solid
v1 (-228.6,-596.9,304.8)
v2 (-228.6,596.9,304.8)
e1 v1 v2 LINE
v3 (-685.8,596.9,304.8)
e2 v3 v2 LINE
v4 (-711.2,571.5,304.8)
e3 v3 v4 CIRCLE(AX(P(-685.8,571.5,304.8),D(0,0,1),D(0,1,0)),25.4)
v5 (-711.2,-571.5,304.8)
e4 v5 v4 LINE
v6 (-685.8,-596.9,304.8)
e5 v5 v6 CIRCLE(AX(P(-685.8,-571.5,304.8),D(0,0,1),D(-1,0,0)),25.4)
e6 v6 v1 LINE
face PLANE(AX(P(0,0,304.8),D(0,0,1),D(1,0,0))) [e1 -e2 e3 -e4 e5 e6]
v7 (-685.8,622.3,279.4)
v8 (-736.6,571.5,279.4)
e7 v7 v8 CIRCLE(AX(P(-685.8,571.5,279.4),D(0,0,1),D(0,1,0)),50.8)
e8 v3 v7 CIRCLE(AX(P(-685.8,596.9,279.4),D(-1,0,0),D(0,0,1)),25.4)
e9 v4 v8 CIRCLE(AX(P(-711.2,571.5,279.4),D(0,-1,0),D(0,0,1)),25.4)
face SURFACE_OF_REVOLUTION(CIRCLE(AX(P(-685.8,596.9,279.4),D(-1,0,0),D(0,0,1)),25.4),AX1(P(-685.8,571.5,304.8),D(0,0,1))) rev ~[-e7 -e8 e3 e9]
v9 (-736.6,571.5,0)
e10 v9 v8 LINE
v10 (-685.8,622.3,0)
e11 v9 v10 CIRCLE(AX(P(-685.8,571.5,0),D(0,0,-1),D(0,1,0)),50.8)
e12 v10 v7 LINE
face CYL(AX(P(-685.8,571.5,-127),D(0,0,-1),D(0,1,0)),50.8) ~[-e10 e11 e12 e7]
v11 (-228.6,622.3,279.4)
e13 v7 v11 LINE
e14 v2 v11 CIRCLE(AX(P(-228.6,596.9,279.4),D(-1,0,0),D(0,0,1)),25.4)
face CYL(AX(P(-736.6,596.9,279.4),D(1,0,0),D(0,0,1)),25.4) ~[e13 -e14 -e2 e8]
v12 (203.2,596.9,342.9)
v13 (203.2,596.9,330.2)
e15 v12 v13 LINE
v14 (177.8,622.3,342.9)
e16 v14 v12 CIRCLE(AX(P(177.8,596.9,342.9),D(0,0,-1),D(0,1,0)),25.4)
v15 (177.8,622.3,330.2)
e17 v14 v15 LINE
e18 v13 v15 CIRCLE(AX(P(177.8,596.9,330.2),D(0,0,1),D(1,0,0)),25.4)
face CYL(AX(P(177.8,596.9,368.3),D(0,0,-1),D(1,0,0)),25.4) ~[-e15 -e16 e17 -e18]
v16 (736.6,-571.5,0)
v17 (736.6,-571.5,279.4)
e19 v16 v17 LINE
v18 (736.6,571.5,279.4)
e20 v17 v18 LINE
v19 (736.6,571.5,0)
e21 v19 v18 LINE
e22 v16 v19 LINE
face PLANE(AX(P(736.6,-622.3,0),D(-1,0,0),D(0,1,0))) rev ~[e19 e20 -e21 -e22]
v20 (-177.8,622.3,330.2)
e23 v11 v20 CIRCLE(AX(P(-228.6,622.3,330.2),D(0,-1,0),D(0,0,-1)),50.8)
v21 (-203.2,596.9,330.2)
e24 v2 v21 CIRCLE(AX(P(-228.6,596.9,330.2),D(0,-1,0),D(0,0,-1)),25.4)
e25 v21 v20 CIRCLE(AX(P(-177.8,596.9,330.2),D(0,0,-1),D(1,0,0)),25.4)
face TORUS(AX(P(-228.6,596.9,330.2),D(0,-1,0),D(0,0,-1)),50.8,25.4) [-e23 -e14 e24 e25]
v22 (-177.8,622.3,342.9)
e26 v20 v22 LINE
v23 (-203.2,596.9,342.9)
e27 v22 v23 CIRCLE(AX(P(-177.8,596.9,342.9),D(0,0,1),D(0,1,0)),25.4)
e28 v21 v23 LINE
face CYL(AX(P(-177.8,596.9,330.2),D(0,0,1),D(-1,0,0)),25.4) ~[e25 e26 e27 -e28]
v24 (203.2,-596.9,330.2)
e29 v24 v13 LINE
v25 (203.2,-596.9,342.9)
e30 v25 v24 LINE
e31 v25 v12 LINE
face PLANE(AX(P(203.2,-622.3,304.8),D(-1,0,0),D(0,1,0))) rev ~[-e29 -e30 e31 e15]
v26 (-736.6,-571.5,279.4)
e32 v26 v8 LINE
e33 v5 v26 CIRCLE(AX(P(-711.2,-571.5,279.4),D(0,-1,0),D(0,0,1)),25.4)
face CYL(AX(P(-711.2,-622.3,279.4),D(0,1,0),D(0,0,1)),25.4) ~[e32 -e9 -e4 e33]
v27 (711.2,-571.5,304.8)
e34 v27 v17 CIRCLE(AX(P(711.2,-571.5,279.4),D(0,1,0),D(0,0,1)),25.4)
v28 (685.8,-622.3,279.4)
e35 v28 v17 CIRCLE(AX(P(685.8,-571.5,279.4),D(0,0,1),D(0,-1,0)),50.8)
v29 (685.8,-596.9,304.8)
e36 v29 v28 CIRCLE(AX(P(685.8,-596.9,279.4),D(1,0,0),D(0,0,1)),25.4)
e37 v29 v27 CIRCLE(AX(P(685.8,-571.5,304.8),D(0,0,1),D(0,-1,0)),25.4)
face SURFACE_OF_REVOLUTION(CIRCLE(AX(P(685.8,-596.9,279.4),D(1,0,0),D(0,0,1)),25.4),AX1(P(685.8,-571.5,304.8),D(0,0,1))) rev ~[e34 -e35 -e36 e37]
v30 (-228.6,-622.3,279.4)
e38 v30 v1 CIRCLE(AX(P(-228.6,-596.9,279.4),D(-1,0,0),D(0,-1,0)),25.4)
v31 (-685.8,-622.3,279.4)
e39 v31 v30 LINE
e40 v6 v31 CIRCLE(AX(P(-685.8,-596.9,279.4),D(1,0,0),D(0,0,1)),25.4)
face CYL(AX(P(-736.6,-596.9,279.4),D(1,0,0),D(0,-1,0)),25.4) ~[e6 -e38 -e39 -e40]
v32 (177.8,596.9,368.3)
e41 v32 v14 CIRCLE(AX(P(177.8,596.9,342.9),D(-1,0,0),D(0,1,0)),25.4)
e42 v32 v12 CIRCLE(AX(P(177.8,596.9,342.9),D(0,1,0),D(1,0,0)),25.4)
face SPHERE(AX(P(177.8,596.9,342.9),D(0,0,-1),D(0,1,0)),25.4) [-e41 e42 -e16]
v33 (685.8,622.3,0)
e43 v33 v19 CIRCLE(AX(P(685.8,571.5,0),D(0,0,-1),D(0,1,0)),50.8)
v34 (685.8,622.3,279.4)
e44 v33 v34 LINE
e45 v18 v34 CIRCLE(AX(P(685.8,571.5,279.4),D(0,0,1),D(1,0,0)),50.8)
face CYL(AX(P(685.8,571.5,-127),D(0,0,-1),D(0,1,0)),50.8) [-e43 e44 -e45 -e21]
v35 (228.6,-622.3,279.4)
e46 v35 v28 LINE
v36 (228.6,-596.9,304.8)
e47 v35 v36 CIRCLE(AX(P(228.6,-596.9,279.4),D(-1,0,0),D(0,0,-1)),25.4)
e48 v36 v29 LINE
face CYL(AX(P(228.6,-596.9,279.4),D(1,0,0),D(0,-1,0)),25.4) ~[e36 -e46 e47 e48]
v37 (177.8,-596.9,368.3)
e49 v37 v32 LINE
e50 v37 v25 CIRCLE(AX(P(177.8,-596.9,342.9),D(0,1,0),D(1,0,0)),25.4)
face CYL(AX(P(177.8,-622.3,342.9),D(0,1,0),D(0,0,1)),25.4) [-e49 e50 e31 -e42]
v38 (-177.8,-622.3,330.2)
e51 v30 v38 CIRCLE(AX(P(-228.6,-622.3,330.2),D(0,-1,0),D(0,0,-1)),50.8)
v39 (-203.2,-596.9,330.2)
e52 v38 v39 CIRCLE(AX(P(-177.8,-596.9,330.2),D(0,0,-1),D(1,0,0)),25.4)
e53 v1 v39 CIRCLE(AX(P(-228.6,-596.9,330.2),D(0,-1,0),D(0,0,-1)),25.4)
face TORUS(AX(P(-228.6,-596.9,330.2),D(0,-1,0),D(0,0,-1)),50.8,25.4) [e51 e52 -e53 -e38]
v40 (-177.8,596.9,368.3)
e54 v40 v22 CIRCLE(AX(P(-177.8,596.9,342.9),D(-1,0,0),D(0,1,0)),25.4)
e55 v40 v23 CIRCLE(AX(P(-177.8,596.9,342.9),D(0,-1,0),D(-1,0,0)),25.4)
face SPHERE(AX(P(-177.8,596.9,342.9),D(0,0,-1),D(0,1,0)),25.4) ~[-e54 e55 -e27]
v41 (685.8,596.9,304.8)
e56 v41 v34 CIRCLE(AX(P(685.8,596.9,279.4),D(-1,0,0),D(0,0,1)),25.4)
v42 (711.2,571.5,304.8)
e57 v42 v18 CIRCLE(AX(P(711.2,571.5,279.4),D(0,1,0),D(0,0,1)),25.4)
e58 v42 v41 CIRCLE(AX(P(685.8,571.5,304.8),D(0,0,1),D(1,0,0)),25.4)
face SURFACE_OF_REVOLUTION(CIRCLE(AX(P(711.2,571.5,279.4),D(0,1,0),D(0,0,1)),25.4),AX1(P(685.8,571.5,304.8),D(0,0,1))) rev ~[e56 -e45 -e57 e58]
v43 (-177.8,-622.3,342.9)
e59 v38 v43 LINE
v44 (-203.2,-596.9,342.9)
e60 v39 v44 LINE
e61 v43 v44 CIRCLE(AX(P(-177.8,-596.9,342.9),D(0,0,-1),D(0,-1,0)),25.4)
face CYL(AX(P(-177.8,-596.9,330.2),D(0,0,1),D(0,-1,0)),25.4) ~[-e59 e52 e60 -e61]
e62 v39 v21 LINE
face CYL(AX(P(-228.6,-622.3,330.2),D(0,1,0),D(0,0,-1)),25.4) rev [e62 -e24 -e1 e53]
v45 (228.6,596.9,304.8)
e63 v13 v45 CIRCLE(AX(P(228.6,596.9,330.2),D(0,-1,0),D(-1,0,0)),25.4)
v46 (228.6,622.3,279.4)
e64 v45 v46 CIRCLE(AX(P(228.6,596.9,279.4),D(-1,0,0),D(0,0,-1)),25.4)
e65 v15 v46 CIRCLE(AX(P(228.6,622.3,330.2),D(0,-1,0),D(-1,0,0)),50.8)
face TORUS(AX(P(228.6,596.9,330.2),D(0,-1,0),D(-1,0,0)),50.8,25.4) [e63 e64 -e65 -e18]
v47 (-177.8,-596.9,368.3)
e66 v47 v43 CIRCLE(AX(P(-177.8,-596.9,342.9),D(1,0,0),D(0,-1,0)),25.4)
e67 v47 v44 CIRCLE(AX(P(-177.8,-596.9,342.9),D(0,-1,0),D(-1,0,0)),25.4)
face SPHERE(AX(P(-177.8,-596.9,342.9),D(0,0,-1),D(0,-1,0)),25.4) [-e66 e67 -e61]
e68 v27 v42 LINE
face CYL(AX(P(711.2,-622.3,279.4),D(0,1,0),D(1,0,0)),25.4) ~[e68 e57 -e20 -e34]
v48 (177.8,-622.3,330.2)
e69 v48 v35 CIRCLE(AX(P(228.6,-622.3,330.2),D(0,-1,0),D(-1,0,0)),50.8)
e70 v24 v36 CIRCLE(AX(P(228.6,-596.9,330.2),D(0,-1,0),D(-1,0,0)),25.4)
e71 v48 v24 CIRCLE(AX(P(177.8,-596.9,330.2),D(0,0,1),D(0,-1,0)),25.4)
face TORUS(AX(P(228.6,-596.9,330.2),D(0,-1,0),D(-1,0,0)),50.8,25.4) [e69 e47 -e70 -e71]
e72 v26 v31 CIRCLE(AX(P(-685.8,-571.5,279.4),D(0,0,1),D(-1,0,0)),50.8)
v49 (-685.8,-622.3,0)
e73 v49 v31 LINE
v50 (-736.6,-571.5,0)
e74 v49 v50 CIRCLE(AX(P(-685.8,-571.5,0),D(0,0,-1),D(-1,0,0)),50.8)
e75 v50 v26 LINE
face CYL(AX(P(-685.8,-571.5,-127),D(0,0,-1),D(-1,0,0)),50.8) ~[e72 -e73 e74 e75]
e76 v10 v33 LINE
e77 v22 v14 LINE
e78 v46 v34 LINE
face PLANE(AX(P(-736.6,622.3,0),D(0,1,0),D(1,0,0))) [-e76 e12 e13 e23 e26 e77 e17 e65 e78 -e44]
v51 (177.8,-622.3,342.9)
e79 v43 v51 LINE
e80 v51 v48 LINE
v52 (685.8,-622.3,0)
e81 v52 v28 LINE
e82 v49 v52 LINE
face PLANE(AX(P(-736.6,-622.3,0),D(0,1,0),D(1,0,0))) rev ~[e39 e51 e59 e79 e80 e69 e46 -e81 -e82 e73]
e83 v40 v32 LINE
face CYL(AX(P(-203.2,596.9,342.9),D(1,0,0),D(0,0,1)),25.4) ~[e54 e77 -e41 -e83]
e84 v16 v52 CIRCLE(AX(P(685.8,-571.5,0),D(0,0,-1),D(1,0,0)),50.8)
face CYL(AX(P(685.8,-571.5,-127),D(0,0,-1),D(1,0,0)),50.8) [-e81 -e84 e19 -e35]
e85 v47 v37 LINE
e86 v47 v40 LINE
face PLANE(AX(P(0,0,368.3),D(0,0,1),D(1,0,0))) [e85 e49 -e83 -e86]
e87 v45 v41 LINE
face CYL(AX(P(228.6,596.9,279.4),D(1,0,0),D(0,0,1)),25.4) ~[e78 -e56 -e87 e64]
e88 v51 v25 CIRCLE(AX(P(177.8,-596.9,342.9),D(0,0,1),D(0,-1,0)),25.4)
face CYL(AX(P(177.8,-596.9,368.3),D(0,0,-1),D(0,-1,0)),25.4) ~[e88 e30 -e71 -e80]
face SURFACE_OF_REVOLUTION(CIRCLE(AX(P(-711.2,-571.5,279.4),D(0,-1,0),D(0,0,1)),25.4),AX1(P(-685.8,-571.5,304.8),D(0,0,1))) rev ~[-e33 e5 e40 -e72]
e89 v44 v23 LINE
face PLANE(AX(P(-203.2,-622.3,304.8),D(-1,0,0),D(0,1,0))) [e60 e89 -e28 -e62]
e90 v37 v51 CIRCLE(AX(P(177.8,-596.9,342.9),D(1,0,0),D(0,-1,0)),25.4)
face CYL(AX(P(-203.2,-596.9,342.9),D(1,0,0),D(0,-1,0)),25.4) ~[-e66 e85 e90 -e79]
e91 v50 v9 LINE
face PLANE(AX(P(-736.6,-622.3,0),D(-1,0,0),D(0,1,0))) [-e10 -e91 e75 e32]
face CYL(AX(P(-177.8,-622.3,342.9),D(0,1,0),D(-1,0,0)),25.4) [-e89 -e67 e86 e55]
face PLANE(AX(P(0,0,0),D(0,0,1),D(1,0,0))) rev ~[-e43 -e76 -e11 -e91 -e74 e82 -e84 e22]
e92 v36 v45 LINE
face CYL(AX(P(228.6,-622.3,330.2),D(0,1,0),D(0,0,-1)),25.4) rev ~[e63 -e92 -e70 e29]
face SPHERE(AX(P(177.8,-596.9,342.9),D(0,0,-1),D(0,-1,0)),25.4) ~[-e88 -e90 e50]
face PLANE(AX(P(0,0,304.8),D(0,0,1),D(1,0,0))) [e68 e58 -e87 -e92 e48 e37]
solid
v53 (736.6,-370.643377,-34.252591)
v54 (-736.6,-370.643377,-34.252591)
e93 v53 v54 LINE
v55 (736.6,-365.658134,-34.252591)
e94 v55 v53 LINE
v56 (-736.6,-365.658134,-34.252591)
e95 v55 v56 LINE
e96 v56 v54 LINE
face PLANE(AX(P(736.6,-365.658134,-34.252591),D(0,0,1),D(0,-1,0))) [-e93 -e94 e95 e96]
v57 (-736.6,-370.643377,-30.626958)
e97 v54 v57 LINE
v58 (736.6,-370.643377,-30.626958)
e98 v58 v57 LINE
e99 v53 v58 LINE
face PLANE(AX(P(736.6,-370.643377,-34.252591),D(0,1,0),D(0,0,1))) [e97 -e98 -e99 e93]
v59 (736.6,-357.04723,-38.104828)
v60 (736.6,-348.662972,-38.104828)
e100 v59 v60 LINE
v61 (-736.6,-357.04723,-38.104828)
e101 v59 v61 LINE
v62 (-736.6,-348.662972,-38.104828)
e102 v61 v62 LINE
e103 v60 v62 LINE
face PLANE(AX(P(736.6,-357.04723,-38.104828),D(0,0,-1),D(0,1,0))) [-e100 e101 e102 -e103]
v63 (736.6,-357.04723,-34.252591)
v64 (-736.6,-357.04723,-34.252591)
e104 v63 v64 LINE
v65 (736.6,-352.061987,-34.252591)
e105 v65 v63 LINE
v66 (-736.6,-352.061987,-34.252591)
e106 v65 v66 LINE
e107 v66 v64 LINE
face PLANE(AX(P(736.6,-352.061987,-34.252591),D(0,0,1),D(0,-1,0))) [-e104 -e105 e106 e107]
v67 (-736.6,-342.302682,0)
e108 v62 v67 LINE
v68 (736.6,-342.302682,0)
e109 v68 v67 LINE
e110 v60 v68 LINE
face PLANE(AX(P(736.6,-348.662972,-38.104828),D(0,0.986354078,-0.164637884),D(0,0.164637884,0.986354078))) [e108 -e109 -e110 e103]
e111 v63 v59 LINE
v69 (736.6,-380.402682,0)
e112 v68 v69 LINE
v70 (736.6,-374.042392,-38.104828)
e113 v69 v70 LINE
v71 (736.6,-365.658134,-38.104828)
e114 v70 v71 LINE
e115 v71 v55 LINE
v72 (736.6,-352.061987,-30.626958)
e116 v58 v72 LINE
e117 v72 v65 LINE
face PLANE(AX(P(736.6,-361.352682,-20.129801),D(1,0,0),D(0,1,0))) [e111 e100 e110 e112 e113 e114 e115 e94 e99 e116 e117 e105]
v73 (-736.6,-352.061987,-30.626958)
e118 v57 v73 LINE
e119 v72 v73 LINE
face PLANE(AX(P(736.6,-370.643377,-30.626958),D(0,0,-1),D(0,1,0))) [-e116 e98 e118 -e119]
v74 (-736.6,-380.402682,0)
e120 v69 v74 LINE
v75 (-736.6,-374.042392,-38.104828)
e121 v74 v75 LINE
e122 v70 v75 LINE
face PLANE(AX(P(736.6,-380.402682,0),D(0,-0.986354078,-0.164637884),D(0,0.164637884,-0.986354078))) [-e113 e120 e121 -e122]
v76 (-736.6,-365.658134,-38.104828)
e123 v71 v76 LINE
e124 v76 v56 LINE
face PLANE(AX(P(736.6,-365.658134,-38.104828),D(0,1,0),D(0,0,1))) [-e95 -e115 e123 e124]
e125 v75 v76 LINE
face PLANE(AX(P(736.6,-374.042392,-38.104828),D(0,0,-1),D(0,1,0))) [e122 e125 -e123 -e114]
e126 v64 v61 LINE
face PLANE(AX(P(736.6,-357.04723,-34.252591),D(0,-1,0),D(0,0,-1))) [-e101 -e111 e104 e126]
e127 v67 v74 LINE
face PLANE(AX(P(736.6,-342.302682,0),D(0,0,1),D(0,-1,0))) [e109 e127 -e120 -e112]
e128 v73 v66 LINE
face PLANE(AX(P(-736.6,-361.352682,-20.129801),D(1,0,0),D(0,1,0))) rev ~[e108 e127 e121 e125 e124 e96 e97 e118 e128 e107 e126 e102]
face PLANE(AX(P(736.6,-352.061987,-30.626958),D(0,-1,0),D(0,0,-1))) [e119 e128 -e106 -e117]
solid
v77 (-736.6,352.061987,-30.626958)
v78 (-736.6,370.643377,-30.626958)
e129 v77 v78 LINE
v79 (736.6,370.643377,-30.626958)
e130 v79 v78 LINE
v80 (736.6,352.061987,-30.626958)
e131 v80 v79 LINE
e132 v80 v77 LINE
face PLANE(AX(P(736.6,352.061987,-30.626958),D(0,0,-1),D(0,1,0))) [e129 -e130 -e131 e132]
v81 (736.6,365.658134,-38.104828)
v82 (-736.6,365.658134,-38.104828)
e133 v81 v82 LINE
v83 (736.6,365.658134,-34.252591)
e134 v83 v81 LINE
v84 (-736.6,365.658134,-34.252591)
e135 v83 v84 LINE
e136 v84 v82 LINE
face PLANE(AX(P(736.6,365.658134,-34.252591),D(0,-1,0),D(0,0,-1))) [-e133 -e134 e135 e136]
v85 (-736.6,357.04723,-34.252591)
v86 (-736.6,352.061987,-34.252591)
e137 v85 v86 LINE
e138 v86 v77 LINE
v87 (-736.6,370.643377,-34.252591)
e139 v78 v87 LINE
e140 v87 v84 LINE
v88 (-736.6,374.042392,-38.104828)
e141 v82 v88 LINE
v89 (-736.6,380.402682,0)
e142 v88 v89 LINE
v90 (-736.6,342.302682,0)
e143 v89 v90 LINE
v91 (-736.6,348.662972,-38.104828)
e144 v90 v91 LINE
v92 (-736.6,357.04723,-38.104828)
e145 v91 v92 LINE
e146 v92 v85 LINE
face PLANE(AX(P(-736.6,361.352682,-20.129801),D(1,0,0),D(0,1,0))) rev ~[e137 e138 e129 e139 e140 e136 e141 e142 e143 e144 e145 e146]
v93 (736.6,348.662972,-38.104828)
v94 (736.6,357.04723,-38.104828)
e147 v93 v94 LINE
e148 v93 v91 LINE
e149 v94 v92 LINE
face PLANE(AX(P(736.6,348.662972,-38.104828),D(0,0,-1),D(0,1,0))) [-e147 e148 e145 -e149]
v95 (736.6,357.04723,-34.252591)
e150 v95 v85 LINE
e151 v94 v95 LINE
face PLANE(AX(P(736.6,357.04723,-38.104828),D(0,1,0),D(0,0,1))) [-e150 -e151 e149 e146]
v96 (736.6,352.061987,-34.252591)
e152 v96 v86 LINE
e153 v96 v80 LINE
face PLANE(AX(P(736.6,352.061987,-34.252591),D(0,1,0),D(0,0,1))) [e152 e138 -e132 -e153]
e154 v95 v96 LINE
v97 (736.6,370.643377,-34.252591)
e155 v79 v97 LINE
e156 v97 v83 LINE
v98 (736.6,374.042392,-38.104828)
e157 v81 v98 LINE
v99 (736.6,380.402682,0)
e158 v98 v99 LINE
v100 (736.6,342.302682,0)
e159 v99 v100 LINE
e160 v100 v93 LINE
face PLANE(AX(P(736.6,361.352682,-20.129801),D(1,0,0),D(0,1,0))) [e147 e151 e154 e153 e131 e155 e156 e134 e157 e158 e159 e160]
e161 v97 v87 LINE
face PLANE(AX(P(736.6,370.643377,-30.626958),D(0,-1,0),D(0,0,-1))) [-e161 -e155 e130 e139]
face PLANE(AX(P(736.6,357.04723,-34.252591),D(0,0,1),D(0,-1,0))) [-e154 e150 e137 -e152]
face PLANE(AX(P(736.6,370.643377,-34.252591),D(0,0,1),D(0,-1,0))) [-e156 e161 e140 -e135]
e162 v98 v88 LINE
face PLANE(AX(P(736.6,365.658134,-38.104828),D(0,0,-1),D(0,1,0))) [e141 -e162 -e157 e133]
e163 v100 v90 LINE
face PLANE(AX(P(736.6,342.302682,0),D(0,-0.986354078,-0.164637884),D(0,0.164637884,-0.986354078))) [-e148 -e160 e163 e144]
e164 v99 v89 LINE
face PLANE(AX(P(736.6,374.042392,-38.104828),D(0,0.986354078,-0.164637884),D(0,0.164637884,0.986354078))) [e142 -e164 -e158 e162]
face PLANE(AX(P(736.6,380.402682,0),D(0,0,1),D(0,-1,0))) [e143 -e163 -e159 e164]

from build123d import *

# Parameters (mm, degrees)
F0_W         = 1473.2
F0_H         = 1244.6
F1_DEPTH     = 304.8
F2_W         = 406.4
F2_H         = 1244.6
F3_DEPTH     = 63.5
F5_F1_R      = 25.4
F5_F2_R      = 25.4
F6_T1_DEPTH  = 431.8
F6_T4_ANGLE  = 90
F6_T6_ANGLE  = 90
F6_T8_ANGLE  = 90
F6_T10_ANGLE = 90
F8_DEPTH     = 1473.2


# Not quite as in the source:
# - a fillet or chamfer that OpenCascade refuses, or shapes differently, is made with other operations: its cross-section is extruded or revolved along the edge and cut away or added
# - a feature of the source that left no trace in its solid (it failed there, or was rolled back) is left out


with BuildPart() as f1:
    # F0 (on Top) → F1 (new body)
    with BuildSketch(Plane.XY):
        Rectangle(F0_W, F0_H)
    extrude(amount=F1_DEPTH)

    # F2 (on face) → F3 (join)
    with BuildSketch(Plane.XY.offset(304.8)):
        Rectangle(F2_W, F2_H)
    extrude(amount=F3_DEPTH)

    # F5: fillet of radius 25.4 on 12 edges, made by hand

    # F5_f1
    f5_f1_edges = [f1.edges().sort_by_distance(p)[0] for p in [
        (-203.2, 0, 304.8),
        (203.2, 0, 304.8),
    ]]
    fillet(f5_f1_edges, radius=F5_F1_R)

    # F5_f2
    f5_f2_edges = [f1.edges().sort_by_distance(p)[0] for p in [
        (-482.6, -622.3, 304.8),
        (482.6, -622.3, 304.8),
        (736.6, 0, 304.8),
        (482.6, 622.3, 304.8),
        (-482.6, 622.3, 304.8),
        (-736.6, 0, 304.8),
        (0, 622.3, 368.3),
        (0, -622.3, 368.3),
        (-203.2, 0, 368.3),
        (203.2, 0, 368.3),
        (-210.6394877579, 622.3, 312.2394877579),
        (210.6394877579, 622.3, 312.2394877579),
        (210.6394877579, -622.3, 312.2394877579),
        (-210.6394877579, -622.3, 312.2394877579),
    ]]
    fillet(f5_f2_edges, radius=F5_F2_R)

    # F6: fillet of radius 50.8 on 4 edges, made by hand

    # F6_s2 → F6_t1 (cut)
    with BuildSketch(Plane.XY.offset(-127)):
        with BuildLine():
            ThreePointArc((736.6, -571.5), (721.7210244843, -607.4210244843), (685.8, -622.3))
            Line((685.8, -622.3), (736.6, -622.3))
            Line((736.6, -622.3), (736.6, -571.5))
        make_face()
        with BuildLine():
            ThreePointArc((685.8, 622.3), (721.7210244843, 607.4210244843), (736.6, 571.5))
            Line((736.6, 571.5), (736.6, 622.3))
            Line((736.6, 622.3), (685.8, 622.3))
        make_face()
        with BuildLine():
            ThreePointArc((-685.8, 622.3), (-721.7210244843, 607.4210244843), (-736.6, 571.5))
            Line((-736.6, 571.5), (-736.6, 622.3))
            Line((-736.6, 622.3), (-685.8, 622.3))
        make_face()
        with BuildLine():
            ThreePointArc((-736.6, -571.5), (-721.7210244843, -607.4210244843), (-685.8, -622.3))
            Line((-685.8, -622.3), (-736.6, -622.3))
            Line((-736.6, -622.3), (-736.6, -571.5))
        make_face()
    extrude(amount=F6_T1_DEPTH, mode=Mode.SUBTRACT)

    # F6_s3 → F6_t4 (revolve, cut)
    with BuildSketch(Plane.XZ.offset(571.5)):
        with BuildLine():
            ThreePointArc((-711.2, 304.8), (-729.1605122421, 297.3605122421), (-736.6, 279.4))
            Line((-736.6, 279.4), (-736.6, 304.8))
            Line((-736.6, 304.8), (-711.2, 304.8))
        make_face()
    revolve(axis=Axis((-685.8, -571.5, 304.8), (0, 0, 1)), revolution_arc=F6_T4_ANGLE, mode=Mode.SUBTRACT)

    # F6_s5 → F6_t6 (revolve, cut)
    with BuildSketch(Plane.YZ.offset(-685.8)):
        with BuildLine():
            ThreePointArc((596.9, 304.8), (614.8605122421, 297.3605122421), (622.3, 279.4))
            Line((622.3, 279.4), (622.3, 304.8))
            Line((622.3, 304.8), (596.9, 304.8))
        make_face()
    revolve(axis=Axis((-685.8, 571.5, 304.8), (0, 0, 1)), revolution_arc=F6_T6_ANGLE, mode=Mode.SUBTRACT)

    # F6_s7 → F6_t8 (revolve, cut)
    with BuildSketch(Plane.XZ.offset(-571.5)):
        with BuildLine():
            ThreePointArc((711.2, 304.8), (729.1605122421, 297.3605122421), (736.6, 279.4))
            Line((736.6, 279.4), (736.6, 304.8))
            Line((736.6, 304.8), (711.2, 304.8))
        make_face()
    revolve(axis=Axis((685.8, 571.5, 304.8), (0, 0, 1)), revolution_arc=F6_T8_ANGLE, mode=Mode.SUBTRACT)

    # F6_s9 → F6_t10 (revolve, cut)
    with BuildSketch(Plane.YZ.offset(685.8)):
        with BuildLine():
            ThreePointArc((-596.9, 304.8), (-614.8605122421, 297.3605122421), (-622.3, 279.4))
            Line((-622.3, 279.4), (-622.3, 304.8))
            Line((-622.3, 304.8), (-596.9, 304.8))
        make_face()
    revolve(axis=Axis((685.8, -571.5, 304.8), (0, 0, 1)), revolution_arc=F6_T10_ANGLE, mode=Mode.SUBTRACT)


with BuildPart() as f8:
    # F7 (on face) → F8 (new body)
    with BuildSketch(Plane.YZ.offset(736.6)):
        Polygon((-342.3026821136, 0), (-361.3526821136, 0), (-380.4026821136, 0), (-374.042391777, -38.1048284471), (-365.658134222, -38.1048284471), (-365.658134222, -34.2525914311), (-370.6433773041, -34.2525914311), (-370.6433773041, -30.6269582361), (-361.3526821136, -30.6269582361), (-352.0619869232, -30.6269582361), (-352.0619869232, -34.2525914311), (-357.0472300053, -34.2525914311), (-357.0472300053, -38.1048284471), (-348.6629724503, -38.1048284471), align=None)
    extrude(amount=-F8_DEPTH)


with BuildPart() as f8b:
    # F7 (on face) → F8, piece 2 (new body)
    with BuildSketch(Plane.YZ.offset(736.6)):
        Polygon((361.3526821136, 0), (342.3026821136, 0), (348.6629724503, -38.1048284471), (357.0472300053, -38.1048284471), (357.0472300053, -34.2525914311), (352.0619869232, -34.2525914311), (352.0619869232, -30.6269582361), (361.3526821136, -30.6269582361), (370.6433773041, -30.6269582361), (370.6433773041, -34.2525914311), (365.658134222, -34.2525914311), (365.658134222, -38.1048284471), (374.042391777, -38.1048284471), (380.4026821136, 0), align=None)
    extrude(amount=-F8_DEPTH)


solid = Compound([f1.part, f8.part, f8b.part])
